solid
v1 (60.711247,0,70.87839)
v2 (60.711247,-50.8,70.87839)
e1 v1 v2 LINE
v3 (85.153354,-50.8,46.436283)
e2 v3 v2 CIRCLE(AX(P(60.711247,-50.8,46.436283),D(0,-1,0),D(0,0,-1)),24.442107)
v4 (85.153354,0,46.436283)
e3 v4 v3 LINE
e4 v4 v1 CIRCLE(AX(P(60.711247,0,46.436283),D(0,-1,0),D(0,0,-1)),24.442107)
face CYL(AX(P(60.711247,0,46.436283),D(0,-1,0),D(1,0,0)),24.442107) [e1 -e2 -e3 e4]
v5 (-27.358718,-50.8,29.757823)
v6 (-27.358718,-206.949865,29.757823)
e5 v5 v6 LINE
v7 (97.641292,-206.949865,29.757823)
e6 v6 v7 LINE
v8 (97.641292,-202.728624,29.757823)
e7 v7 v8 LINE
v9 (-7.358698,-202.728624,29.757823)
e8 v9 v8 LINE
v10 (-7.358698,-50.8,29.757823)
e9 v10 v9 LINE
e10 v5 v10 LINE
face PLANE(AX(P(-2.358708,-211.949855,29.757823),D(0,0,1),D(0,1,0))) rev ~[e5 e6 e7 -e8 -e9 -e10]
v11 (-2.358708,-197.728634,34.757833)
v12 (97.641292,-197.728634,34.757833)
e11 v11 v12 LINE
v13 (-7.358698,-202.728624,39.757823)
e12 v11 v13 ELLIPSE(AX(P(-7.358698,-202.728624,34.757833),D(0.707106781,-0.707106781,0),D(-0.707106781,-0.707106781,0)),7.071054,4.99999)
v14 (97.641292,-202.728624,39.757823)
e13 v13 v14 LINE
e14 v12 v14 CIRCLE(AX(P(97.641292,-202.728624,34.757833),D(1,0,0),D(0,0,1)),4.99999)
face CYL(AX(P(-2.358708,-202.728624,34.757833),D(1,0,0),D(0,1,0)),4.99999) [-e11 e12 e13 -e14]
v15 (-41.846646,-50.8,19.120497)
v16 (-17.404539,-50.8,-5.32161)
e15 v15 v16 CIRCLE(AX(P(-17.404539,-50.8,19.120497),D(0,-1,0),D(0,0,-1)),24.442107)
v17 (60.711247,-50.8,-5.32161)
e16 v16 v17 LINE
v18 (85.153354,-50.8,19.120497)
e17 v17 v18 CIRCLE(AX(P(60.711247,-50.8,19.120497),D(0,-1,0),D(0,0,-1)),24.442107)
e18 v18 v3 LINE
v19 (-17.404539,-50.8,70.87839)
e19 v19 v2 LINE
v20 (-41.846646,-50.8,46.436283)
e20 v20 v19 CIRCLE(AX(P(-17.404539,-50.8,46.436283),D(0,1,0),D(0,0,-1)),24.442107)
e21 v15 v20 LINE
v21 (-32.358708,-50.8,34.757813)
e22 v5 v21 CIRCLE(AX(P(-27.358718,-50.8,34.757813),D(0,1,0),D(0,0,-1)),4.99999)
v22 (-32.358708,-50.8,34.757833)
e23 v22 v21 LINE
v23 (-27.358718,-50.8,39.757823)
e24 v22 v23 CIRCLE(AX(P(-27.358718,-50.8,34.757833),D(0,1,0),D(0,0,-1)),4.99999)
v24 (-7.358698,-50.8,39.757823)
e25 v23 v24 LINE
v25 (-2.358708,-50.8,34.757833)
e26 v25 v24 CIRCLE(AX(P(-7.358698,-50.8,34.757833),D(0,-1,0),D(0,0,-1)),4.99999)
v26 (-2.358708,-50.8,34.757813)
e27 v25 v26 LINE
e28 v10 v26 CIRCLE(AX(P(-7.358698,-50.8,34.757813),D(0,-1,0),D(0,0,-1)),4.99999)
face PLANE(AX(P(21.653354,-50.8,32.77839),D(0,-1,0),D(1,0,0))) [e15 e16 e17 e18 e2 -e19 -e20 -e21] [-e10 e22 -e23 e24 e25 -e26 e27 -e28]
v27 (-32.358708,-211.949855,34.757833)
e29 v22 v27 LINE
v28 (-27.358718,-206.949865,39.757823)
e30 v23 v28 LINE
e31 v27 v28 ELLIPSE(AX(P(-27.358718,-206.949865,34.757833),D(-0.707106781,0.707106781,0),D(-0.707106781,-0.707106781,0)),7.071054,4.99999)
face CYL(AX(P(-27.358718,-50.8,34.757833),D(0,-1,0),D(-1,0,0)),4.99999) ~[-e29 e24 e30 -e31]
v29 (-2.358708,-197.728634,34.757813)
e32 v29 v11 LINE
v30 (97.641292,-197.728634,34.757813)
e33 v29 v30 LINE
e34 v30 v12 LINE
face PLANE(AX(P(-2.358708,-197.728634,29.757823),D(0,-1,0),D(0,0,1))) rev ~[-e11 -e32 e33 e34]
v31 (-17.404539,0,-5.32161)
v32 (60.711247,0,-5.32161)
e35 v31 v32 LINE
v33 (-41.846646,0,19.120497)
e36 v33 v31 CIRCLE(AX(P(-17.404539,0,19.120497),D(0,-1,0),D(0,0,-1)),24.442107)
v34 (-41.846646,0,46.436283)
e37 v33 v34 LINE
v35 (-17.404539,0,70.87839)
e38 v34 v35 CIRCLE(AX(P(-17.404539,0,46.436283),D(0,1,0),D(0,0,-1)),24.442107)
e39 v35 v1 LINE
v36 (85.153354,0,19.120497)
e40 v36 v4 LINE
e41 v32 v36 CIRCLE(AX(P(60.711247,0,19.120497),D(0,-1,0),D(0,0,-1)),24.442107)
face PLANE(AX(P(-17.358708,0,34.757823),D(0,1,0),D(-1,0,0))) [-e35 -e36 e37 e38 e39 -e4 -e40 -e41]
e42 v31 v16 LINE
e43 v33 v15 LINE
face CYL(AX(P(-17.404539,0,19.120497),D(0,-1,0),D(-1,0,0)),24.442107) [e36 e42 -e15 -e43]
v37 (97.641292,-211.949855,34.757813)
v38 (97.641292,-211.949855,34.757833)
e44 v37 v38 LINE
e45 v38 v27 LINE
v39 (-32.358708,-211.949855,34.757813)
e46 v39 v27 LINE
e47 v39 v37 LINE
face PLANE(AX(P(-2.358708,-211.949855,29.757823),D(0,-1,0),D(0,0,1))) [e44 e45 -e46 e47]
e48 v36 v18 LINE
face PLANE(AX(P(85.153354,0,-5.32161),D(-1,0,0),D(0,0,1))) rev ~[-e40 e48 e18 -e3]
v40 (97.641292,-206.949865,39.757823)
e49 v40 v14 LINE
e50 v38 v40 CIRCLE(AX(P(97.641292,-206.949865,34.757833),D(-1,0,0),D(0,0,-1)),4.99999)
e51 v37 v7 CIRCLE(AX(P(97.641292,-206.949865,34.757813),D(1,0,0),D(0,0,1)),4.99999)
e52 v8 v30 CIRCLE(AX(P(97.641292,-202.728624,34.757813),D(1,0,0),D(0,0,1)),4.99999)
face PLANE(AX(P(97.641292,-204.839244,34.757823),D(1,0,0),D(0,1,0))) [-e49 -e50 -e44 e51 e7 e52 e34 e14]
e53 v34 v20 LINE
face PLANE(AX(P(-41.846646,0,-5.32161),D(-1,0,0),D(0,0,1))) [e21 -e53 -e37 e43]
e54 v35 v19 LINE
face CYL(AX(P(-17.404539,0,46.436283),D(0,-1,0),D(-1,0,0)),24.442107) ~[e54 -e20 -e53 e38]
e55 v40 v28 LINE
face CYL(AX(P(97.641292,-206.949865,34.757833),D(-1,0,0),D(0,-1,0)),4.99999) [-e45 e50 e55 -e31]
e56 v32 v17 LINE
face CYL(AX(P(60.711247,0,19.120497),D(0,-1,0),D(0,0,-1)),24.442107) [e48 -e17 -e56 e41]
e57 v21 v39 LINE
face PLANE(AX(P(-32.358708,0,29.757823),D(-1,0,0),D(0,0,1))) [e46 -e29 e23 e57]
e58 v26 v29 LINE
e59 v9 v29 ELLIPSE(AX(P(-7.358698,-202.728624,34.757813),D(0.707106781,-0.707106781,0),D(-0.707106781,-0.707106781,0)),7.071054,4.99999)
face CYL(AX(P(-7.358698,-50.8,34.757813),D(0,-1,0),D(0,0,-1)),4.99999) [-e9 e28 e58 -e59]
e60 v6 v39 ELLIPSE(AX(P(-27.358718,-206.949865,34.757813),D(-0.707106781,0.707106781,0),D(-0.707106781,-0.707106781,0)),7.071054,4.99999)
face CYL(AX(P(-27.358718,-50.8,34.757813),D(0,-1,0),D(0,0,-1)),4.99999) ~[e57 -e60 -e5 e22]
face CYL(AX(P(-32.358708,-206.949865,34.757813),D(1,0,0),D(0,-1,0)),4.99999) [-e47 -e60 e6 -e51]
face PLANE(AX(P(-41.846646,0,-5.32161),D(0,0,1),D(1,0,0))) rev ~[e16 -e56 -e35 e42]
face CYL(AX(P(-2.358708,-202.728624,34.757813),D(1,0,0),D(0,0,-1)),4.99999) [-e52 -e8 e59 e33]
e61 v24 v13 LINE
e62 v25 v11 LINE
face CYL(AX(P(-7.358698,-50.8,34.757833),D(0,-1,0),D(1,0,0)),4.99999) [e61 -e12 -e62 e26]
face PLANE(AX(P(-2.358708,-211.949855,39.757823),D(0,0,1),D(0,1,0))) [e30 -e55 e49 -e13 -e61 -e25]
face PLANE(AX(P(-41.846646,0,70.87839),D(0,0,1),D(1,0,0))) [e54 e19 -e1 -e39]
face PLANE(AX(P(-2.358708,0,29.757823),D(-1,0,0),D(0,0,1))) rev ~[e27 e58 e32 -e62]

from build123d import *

# Parameters (mm, degrees)
F0_W     = 127
F0_H     = 76.2
F1_DEPTH = 50.8
F2_R     = 24.4421069165
F4_W     = 30
F4_H     = 10
F5_DEPTH = 211.9498550892
F6_W     = 14.2212212086
F6_H     = 10
F7_DEPTH = 100
F8_R     = 4.99999


# Not quite as in the source:
# - a fillet or chamfer is up to 0.001 mm smaller than in the source, because OpenCascade refuses the exact size


with BuildPart() as f1:
    # F0 (on Front) → F1 (new body)
    with BuildSketch(Plane.XZ):
        with Locations((21.6533541679, 32.7783897177)):
            Rectangle(F0_W, F0_H)
    extrude(amount=F1_DEPTH)

    # F2
    f2_edges = [f1.edges().sort_by_distance(p)[0] for p in [
        (-41.846646, -25.4, 70.87839),
        (-41.846646, -25.4, -5.32161),
        (85.153354, -25.4, -5.32161),
        (85.153354, -25.4, 70.87839),
    ]]
    fillet(f2_edges, radius=F2_R)

    # F4 (on face) → F5 (join)
    with BuildSketch(Plane(origin=(0, 0, 0), x_dir=(-1, 0, 0), z_dir=(0, 1, 0))):
        with Locations((17.3587081618, 34.757822752)):
            Rectangle(F4_W, F4_H)
    extrude(amount=-F5_DEPTH)

    # F6 (on face) → F7 (join)
    with BuildSketch(Plane.YZ.offset(-2.3587081618)):
        with Locations((-204.8392444849, 34.757822752)):
            Rectangle(F6_W, F6_H)
    extrude(amount=F7_DEPTH)

    # F8 (radius 5 in the source; OpenCascade refuses exactly that, so slightly less here)
    f8_edges = [f1.edges().sort_by_distance(p)[0] for p in [
        (-32.358708, -131.374928, 39.757823),
        (-32.358708, -131.374928, 29.757823),
        (32.641292, -211.949855, 29.757823),
        (-2.358708, -124.264317, 29.757823),
        (-2.358708, -124.264317, 39.757823),
        (47.641292, -197.728634, 39.757823),
        (32.641292, -211.949855, 39.757823),
        (47.641292, -197.728634, 29.757823),
    ]]
    fillet(f8_edges, radius=F8_R)


solid = f1.part
